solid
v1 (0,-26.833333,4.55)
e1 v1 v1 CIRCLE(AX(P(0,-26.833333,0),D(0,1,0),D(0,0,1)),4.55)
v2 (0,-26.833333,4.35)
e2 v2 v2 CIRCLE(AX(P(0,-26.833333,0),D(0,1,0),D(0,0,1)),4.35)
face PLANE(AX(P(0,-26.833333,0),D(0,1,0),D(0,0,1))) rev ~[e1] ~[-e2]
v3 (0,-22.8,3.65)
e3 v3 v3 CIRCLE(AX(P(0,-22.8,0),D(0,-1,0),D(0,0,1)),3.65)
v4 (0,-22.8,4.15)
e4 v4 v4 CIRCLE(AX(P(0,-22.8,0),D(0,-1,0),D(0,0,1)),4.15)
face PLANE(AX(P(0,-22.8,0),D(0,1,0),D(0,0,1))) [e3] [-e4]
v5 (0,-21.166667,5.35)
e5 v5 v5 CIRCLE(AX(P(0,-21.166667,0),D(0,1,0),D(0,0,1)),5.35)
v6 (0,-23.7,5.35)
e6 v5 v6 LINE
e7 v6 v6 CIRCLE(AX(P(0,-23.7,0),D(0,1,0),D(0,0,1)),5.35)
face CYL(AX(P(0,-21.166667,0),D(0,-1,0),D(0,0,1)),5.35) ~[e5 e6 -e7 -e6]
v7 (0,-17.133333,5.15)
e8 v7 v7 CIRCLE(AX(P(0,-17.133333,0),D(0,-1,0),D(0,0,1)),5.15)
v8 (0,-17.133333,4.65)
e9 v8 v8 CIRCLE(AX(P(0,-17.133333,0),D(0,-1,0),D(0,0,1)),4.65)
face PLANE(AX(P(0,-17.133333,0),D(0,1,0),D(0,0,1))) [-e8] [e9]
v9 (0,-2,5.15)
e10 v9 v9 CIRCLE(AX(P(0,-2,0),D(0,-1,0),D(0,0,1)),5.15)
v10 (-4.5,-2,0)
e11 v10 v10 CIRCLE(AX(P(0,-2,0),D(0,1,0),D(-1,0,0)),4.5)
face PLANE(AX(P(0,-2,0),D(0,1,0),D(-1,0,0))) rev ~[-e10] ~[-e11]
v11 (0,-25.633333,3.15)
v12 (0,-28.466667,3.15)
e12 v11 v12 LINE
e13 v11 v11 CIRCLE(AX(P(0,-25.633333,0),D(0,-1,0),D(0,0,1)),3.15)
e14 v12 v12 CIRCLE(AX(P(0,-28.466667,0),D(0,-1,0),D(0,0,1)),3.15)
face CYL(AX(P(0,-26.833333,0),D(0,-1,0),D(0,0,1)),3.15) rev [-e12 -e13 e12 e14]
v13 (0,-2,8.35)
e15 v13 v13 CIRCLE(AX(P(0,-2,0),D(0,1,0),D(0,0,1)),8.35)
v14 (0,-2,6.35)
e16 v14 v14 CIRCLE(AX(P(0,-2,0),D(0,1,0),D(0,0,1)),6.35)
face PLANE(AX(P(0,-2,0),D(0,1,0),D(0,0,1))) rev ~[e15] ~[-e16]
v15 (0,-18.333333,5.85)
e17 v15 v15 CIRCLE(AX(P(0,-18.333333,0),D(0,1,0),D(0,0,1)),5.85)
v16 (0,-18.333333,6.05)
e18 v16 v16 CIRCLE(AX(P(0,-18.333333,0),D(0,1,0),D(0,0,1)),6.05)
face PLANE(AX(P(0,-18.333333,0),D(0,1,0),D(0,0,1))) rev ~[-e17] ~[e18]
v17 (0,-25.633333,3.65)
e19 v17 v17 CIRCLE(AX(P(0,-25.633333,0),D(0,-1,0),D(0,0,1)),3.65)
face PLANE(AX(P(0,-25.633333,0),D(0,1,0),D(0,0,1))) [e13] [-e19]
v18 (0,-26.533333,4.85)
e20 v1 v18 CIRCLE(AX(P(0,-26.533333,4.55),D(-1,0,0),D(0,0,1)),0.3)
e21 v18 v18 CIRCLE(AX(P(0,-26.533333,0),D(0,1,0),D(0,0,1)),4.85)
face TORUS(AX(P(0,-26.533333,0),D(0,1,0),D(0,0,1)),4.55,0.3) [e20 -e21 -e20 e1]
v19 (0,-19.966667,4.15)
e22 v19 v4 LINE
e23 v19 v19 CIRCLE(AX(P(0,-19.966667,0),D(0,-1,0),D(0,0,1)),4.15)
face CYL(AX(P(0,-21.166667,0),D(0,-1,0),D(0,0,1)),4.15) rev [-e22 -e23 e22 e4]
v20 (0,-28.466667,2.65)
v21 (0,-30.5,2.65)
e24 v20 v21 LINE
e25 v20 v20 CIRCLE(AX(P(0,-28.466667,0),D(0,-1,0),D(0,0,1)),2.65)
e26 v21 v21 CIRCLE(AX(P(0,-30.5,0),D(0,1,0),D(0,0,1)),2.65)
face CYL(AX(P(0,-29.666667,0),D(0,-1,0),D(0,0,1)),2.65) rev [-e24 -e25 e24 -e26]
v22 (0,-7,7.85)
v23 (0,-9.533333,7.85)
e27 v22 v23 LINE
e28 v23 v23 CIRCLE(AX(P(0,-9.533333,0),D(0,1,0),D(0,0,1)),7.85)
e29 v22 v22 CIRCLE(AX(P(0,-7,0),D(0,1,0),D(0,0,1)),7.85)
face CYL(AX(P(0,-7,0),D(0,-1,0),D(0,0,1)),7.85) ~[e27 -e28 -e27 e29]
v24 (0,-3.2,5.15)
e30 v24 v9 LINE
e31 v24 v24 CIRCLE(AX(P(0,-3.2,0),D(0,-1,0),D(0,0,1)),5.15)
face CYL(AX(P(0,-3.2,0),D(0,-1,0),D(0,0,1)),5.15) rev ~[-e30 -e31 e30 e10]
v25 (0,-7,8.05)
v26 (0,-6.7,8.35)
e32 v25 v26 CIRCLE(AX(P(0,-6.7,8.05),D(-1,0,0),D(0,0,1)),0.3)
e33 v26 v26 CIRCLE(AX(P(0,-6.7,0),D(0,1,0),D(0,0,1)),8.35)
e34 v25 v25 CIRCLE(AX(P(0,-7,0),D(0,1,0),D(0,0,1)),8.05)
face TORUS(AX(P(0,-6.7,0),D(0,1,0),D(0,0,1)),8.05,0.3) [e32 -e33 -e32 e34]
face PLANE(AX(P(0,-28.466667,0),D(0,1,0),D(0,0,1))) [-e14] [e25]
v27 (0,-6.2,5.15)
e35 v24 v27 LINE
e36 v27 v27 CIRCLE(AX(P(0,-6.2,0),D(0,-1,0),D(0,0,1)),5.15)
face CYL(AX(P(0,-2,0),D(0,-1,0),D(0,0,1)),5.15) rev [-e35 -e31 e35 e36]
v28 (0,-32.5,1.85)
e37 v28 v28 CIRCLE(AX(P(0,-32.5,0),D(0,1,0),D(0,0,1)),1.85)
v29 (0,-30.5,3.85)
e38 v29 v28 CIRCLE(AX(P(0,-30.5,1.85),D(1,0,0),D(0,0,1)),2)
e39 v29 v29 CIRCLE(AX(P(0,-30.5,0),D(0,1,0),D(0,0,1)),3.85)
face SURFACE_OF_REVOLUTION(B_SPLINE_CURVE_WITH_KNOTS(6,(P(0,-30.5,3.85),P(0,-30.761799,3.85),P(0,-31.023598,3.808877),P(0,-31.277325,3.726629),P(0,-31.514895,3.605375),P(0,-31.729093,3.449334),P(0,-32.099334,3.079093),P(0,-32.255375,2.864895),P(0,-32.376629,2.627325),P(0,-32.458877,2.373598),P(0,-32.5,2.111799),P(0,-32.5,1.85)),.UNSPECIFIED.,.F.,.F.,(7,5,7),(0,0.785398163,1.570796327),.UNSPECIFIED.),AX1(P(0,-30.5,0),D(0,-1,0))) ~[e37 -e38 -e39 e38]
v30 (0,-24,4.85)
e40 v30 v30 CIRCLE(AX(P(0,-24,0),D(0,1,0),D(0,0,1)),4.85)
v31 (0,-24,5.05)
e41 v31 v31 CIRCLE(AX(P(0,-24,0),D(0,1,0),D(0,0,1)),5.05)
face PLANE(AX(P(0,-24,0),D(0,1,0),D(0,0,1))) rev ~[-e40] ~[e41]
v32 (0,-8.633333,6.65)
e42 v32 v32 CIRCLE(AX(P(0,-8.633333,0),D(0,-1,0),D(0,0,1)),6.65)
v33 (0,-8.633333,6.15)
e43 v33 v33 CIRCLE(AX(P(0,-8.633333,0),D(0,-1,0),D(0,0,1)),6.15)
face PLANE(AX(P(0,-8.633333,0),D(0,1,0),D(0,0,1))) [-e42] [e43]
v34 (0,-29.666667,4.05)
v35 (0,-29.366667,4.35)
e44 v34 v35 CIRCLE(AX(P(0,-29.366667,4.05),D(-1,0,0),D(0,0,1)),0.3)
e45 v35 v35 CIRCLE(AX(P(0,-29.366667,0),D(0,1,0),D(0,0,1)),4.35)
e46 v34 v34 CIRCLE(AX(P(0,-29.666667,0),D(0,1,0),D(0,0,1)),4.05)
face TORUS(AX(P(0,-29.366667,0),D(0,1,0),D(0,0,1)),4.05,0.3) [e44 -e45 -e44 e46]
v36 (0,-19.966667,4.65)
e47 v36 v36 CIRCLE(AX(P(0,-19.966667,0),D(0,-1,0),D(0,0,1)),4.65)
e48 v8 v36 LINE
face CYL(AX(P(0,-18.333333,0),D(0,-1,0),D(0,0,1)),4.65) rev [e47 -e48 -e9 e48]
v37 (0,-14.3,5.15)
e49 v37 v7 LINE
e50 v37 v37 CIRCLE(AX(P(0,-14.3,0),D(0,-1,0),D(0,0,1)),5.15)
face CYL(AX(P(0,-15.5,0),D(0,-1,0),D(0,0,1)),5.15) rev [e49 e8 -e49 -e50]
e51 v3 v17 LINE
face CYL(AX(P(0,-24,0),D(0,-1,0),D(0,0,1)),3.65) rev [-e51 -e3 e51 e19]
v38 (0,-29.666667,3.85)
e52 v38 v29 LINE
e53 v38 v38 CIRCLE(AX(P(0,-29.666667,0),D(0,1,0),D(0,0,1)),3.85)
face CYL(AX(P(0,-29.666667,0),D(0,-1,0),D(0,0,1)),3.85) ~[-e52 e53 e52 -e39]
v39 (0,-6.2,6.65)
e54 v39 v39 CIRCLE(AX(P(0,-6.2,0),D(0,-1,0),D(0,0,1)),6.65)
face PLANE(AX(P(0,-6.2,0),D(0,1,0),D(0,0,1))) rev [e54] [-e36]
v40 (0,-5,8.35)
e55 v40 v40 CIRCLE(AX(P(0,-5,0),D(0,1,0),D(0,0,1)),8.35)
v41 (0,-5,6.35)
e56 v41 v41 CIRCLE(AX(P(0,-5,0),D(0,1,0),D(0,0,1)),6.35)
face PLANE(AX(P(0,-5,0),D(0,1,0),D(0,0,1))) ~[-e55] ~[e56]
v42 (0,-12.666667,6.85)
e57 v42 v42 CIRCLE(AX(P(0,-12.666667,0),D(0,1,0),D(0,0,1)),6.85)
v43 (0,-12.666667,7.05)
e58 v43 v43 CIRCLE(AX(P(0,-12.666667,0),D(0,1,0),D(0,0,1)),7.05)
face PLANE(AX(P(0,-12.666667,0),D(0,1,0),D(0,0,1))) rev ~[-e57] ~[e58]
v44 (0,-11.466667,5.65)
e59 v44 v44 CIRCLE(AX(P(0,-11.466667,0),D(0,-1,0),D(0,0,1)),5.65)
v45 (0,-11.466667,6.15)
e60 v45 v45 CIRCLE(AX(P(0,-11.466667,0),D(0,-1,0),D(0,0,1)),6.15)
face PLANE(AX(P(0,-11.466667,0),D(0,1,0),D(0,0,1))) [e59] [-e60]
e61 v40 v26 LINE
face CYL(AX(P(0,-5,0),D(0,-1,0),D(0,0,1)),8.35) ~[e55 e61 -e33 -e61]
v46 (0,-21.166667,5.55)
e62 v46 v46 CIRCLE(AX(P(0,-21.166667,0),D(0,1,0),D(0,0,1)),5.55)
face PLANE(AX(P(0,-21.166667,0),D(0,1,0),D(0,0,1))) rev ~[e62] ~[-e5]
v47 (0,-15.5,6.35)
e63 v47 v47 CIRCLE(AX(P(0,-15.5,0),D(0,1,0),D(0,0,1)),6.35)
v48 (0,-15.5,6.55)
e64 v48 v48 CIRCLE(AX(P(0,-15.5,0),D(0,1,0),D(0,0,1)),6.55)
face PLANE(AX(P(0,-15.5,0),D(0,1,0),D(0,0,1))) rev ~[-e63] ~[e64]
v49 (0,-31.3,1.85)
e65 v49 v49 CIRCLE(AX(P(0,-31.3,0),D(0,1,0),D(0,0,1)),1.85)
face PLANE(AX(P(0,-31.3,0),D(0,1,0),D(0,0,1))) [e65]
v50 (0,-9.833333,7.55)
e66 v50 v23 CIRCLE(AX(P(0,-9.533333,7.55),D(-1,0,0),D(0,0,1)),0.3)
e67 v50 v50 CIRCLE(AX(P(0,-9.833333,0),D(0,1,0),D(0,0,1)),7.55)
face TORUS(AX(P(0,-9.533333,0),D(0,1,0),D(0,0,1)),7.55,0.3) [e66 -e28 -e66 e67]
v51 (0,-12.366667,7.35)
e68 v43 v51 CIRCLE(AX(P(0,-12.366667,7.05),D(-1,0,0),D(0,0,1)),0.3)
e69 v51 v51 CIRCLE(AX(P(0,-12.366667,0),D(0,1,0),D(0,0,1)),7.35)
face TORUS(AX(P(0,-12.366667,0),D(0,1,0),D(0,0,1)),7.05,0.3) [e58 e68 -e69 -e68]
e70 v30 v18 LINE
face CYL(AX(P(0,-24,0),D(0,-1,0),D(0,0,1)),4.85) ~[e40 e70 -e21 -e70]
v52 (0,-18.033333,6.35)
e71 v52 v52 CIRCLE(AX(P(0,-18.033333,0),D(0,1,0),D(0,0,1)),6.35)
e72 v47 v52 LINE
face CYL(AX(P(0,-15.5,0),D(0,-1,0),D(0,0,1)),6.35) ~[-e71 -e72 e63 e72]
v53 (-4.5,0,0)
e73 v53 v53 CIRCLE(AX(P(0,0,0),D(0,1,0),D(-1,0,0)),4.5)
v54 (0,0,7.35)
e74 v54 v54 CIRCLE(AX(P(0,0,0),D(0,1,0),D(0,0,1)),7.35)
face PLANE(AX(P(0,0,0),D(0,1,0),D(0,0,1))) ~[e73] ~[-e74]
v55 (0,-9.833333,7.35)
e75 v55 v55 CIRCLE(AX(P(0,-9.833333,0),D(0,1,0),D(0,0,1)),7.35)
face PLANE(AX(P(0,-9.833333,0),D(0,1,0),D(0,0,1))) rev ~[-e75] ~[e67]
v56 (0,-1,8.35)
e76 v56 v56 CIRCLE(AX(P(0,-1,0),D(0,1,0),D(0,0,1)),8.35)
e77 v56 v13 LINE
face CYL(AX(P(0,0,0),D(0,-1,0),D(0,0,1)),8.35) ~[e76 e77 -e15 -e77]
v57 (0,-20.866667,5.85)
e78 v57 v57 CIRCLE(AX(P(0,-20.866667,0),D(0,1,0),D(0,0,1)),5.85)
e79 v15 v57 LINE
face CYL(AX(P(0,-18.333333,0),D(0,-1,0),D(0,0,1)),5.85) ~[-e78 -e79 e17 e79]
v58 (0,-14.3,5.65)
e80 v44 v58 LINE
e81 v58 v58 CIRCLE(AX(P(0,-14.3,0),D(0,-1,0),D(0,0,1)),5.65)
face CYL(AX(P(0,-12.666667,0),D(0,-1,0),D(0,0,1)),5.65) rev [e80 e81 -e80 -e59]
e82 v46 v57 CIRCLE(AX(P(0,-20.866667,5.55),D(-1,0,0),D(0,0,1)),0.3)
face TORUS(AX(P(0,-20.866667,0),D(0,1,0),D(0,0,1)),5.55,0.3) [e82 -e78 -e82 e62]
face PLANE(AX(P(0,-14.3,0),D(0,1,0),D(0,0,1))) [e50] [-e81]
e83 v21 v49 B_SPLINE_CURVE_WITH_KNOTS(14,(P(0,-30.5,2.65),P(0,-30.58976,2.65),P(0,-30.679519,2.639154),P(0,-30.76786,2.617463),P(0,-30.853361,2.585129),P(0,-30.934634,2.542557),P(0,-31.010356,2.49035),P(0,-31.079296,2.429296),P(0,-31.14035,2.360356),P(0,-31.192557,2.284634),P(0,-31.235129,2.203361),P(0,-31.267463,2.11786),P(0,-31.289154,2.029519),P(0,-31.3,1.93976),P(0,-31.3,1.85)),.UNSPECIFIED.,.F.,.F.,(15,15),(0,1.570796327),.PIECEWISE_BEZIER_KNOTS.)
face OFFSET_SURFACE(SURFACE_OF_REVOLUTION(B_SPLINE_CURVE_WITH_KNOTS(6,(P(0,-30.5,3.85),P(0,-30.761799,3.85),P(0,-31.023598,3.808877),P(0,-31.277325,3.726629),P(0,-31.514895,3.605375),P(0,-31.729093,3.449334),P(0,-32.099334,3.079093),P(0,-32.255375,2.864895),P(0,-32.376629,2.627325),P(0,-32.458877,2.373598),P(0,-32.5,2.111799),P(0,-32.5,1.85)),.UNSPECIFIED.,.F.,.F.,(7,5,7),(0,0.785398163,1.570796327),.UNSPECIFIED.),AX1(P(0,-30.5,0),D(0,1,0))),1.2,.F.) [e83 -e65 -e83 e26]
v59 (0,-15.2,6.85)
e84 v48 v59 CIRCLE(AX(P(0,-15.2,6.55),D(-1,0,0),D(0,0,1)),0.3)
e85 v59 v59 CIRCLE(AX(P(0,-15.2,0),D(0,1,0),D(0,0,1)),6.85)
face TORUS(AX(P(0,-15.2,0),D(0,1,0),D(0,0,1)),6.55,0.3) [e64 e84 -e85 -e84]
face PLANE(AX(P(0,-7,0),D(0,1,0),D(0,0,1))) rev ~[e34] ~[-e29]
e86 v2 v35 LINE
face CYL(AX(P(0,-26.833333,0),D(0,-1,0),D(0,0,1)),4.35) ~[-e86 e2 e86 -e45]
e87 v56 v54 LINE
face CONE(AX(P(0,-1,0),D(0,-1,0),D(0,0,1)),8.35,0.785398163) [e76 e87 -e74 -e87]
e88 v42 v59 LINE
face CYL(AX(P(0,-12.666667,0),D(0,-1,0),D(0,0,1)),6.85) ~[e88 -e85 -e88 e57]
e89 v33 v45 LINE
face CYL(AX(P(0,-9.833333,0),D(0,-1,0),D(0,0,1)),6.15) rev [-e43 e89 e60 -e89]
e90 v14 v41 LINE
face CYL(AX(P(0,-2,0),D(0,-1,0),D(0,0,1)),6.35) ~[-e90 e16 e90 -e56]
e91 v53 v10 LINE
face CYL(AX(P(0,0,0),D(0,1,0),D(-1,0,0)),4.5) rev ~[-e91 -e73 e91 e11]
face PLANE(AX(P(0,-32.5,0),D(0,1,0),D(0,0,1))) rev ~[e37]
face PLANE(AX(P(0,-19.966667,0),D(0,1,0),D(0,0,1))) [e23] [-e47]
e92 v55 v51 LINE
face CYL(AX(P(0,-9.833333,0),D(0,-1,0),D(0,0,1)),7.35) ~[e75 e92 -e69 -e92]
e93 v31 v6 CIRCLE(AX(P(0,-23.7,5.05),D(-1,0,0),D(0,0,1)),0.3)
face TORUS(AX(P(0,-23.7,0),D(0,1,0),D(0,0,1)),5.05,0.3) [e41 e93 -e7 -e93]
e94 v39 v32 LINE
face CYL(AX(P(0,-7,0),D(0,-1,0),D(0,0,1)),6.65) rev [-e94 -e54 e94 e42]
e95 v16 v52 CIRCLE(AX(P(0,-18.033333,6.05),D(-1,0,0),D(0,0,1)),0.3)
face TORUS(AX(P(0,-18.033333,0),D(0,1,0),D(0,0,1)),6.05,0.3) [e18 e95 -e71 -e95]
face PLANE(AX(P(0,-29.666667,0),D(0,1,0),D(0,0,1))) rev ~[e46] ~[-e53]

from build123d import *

# Parameters (mm, degrees)
F2_R     = 4.5
F3_DEPTH = 2
F4_R     = 2
F5_R     = 0.3
F6_SIZE  = 1
F7_T     = -1.2


# Not quite as in the source:
# - a shell that OpenCascade refuses in one call is made with other operations: the cavity is built on its own and cut out


with BuildPart() as f1:
    # F0 (on Right) → F1 (revolve)
    with BuildSketch(Plane.YZ):
        Polygon((-32.5, 0), (0, 0), (0, 8.35), (-2, 8.35), (-2, 6.35), (-5, 6.35), (-5, 8.35), (-7, 8.35), (-7, 7.85), (-9.8333333333, 7.85), (-9.8333333333, 7.35), (-12.6666666667, 7.35), (-12.6666666667, 6.85), (-15.5, 6.85), (-15.5, 6.35), (-18.3333333333, 6.35), (-18.3333333333, 5.85), (-21.1666666667, 5.85), (-21.1666666667, 5.35), (-24, 5.35), (-24, 4.85), (-26.8333333333, 4.85), (-26.8333333333, 4.35), (-29.6666666667, 4.35), (-29.6666666667, 3.85), (-32.5, 3.85), align=None)
    revolve(axis=Axis((0, -16.25, 0), (0, 1, 0)))

    # F2 (on face) → F3 (cut)
    with BuildSketch(Plane(origin=(0, 0, 0), x_dir=(-1, 0, 0), z_dir=(0, 1, 0))):
        Circle(F2_R)
    extrude(amount=-F3_DEPTH, mode=Mode.SUBTRACT)

    # F4
    f4_edges = [f1.edges().sort_by_distance(p)[0] for p in [
        (0, -32.5, -3.85),
    ]]
    fillet(f4_edges, radius=F4_R)

    # F5
    f5_edges = [f1.edges().sort_by_distance(p)[0] for p in [
        (0, -7, -8.35),
        (0, -9.833333, -7.85),
        (0, -12.666667, -7.35),
        (0, -15.5, -6.85),
        (0, -18.333333, -6.35),
        (0, -21.166667, -5.85),
        (0, -24, -5.35),
        (0, -26.833333, -4.85),
        (0, -29.666667, -4.35),
    ]]
    fillet(f5_edges, radius=F5_R)

    # F6
    f6_edges = [f1.edges().sort_by_distance(p)[0] for p in [
        (0, 0, -8.35),
    ]]
    chamfer(f6_edges, length=F6_SIZE)

    # F7: a shell. OpenCascade refuses it in one call, so the cavity is built on its own and cut out:
    # the body offset inwards by the wall thickness, plus a prism from it out through each open face.
    f7_core = offset(f1.part, amount=F7_T, kind=Kind.INTERSECTION, mode=Mode.PRIVATE)
    f7_exits = [f7_core.faces().sort_by_distance(p)[0] for p in [
        (0, -3.2, 0),
    ]]
    add(f7_core, mode=Mode.SUBTRACT)
    extrude(f7_exits, amount=-F7_T, mode=Mode.SUBTRACT)


solid = f1.part
